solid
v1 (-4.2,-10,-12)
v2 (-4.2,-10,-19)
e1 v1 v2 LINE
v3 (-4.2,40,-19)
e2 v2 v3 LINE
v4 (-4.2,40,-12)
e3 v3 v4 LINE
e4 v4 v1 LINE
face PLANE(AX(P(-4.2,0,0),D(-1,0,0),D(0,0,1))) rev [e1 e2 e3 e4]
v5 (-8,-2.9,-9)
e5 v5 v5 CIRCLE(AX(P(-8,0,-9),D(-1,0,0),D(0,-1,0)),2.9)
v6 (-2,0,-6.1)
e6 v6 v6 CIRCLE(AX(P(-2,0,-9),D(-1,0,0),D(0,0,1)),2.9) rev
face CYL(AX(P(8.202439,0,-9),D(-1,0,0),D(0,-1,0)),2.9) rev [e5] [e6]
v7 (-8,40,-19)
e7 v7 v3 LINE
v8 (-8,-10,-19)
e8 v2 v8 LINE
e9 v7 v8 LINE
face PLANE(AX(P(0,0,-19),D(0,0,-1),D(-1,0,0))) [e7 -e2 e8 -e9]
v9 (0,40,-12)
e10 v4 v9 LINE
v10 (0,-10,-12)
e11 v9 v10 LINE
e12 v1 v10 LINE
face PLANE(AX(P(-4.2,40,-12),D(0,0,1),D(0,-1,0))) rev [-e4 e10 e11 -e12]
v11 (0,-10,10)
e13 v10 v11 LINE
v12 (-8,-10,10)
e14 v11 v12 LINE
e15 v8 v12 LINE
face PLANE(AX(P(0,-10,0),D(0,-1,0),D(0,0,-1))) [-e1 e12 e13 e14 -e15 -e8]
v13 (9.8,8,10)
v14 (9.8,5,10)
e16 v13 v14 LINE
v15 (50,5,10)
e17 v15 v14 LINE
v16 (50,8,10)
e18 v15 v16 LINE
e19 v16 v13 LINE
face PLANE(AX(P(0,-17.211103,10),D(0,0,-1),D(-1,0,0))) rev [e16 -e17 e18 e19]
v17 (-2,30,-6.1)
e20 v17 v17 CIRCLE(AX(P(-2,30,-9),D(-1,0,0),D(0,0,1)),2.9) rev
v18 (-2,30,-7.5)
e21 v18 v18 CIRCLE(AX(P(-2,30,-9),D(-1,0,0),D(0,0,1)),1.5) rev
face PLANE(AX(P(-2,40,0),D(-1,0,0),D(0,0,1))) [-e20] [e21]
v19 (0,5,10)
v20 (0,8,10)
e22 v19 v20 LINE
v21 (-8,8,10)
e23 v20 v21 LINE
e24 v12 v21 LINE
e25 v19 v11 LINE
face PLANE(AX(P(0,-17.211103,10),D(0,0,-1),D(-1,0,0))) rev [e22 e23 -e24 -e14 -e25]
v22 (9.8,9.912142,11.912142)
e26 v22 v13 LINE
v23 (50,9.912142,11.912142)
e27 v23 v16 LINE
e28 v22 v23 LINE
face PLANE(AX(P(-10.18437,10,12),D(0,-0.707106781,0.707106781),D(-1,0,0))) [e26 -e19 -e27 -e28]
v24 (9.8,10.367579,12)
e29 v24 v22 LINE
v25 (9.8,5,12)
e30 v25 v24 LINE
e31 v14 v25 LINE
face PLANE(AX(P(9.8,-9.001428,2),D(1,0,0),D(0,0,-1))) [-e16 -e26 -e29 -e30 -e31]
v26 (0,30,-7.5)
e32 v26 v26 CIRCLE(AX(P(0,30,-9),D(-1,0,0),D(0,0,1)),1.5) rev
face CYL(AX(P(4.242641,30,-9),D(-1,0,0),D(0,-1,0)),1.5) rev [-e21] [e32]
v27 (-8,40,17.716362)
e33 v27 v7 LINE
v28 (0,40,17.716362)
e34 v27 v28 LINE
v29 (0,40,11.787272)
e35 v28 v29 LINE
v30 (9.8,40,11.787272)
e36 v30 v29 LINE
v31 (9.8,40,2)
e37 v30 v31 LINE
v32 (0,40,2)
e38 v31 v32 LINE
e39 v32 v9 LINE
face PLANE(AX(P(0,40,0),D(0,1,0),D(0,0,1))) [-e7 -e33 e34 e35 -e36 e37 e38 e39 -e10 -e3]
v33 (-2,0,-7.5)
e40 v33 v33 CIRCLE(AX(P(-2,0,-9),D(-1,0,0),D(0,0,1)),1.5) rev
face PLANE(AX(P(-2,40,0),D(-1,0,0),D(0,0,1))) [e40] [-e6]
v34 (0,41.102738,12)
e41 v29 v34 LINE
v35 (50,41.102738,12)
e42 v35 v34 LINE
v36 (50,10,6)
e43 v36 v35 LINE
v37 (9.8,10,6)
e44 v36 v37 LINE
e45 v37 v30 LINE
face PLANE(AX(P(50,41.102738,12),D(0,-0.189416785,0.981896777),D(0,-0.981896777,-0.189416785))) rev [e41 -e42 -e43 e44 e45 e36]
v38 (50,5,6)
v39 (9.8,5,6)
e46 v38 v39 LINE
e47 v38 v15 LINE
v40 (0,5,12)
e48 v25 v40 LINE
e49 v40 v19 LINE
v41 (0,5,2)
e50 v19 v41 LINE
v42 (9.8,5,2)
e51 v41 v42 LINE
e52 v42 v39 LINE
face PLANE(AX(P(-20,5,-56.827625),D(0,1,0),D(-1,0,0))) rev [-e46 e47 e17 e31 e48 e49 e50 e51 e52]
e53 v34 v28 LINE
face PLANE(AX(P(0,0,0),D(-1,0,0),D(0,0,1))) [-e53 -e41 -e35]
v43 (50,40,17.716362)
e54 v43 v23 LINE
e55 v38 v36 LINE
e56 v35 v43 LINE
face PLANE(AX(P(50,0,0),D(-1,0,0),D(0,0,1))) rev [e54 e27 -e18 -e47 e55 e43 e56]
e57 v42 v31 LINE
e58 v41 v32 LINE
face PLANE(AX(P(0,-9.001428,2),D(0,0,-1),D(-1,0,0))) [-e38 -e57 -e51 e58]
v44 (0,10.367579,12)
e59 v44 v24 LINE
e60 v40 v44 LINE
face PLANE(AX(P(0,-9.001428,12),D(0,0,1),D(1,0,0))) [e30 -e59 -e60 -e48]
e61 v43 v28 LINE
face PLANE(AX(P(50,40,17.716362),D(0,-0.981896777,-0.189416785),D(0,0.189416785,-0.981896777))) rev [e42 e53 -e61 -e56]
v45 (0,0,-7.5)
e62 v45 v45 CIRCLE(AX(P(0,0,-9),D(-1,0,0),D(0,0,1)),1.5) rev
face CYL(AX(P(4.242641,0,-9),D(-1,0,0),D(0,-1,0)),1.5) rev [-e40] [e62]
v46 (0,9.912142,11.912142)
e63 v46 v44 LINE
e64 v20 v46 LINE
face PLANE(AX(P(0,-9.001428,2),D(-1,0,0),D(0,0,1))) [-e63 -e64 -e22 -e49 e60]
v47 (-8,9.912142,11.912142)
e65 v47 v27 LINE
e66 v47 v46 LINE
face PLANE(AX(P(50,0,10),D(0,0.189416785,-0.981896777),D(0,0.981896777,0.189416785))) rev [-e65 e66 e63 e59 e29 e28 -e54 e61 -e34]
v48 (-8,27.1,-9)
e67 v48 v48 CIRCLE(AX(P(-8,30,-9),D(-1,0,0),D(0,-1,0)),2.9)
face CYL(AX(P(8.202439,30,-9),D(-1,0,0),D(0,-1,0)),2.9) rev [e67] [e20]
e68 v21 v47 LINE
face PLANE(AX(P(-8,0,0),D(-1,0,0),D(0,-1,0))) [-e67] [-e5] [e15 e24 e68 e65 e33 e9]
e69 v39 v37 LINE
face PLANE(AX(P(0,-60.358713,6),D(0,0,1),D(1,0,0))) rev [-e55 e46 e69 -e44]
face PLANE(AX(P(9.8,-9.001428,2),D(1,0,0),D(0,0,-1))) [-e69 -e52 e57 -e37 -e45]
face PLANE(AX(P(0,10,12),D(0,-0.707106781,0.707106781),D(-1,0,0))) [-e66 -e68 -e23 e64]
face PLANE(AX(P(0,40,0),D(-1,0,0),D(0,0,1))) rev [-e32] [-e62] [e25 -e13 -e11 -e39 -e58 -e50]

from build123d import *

# Parameters (mm, degrees)
EXTRUDE_1_DEPTH      = 50
SKETCH_2_W           = 50
SKETCH_2_H           = 10
EXTRUDE_2_DEPTH      = 10
SKETCH_3_W           = 10
SKETCH_3_H           = 20
EXTRUDE_3_DEPTH      = 20
SKETCH_4_W           = 20
SKETCH_4_H           = 10
EXTRUDE_4_DEPTH      = 30
CUT_EXTRUDE_1_DEPTH  = 50
CHAMFER_1_SIZE       = 2
SKETCH_9_R           = 1.5
CUT_EXTRUDE_2_DEPTH  = 66.493778942
CUT_EXTRUDE_4_DEPTH  = 6
SKETCH_13_W          = 4
SKETCH_13_H          = 6
EXTRUDE_12_DEPTH     = 18
SKETCH_14_W          = 20
SKETCH_14_H          = 20
EXTRUDE_13_DEPTH     = 6
CUT_EXTRUDE_START    = -20
SKETCH_15_W          = 50
SKETCH_15_H          = 6
CUT_EXTRUDE_5_DEPTH  = 20
SKETCH_16_W          = 4
SKETCH_16_H          = 4
CUT_EXTRUDE_7_DEPTH  = 18
EXTRUDE_14_REACH     = 68.163
SKETCH_17_W          = 5
SKETCH_17_H          = 30
SKETCH_18_W          = 50
SKETCH_18_H          = 4
EXTRUDE_15_DEPTH     = 18
CUT_EXTRUDE_8_REACH  = 67.494
SKETCH_19_W          = 60
SKETCH_19_H          = 10
SKETCH_20_R          = 1.5
CUT_EXTRUDE_9_DEPTH  = 4
CHAMFER_2_SIZE       = 2
SKETCH_21_W          = 15
SKETCH_21_H          = 50
CUT_EXTRUDE_10_DEPTH = 10
SKETCH_22_W          = 5
SKETCH_22_H          = 50
EXTRUDE_16_DEPTH     = 19
SKETCH_23_W          = 7
SKETCH_23_H          = 50
CUT_EXTRUDE_11_DEPTH = 4.2
EXTRUDE_17_DEPTH     = 3
SKETCH_25_R          = 1.5
CUT_EXTRUDE_12_DEPTH = 8
SKETCH_26_R          = 2.9
CUT_EXTRUDE_13_DEPTH = 6
CUT_EXTRUDE_14_REACH = 67.988
SKETCH_27_W          = 4
SKETCH_27_H          = 10
SKETCH_29_W          = 8
SKETCH_29_H          = 10
EXTRUDE_18_DEPTH     = 6
SKETCH_30_W          = 50
SKETCH_30_H          = 5
CUT_EXTRUDE_15_DEPTH = 4
EXTRUDE_19_REACH     = 75.219
SKETCH_31_W          = 9.8
SKETCH_31_H          = 10


with BuildPart() as part:
    # 草图1 → 凸台-拉伸1 (new body)
    with BuildSketch(Plane(origin=(0, 0, 0), x_dir=(0, 0, -1), z_dir=(1, 0, 0))):
        Polygon((0, 0), (-10, 0), (-17.716362436, 40), (-12, 41.102738109), (-6, 10), (0, 10), align=None)
    extrude(amount=EXTRUDE_1_DEPTH)

    # 草图2 → 凸台-拉伸2 (add)
    with BuildSketch(Plane.XZ):
        with Locations((25, 5)):
            Rectangle(SKETCH_2_W, SKETCH_2_H)
    extrude(amount=EXTRUDE_2_DEPTH)

    # 草图3 → 凸台-拉伸3 (add)
    with BuildSketch(Plane.ZY):
        with Locations((5, 0)):
            Rectangle(SKETCH_3_W, SKETCH_3_H)
    extrude(amount=EXTRUDE_3_DEPTH)

    # 草图4 → 凸台-拉伸4 (add)
    with BuildSketch(Plane(origin=(0, 10, 0), x_dir=(1, 0, 0), z_dir=(0, 1, 0))):
        with Locations((-10, -5)):
            Rectangle(SKETCH_4_W, SKETCH_4_H)
    extrude(amount=EXTRUDE_4_DEPTH)

    # 草图5 → 切除-拉伸1 (cut)
    with BuildSketch(Plane(origin=(50, 0, 0), x_dir=(0, 0, -1), z_dir=(1, 0, 0))):
        Polygon((-10, 10), (-11.929090609, 10), (-10, 0), align=None)
    extrude(amount=-CUT_EXTRUDE_1_DEPTH, mode=Mode.SUBTRACT)

    # 倒角1
    # the kernel refuses this chamfer: 2 mm, written as the material it adds along each edge
    with BuildSketch(Plane(origin=(50, 10, 10), x_dir=(0, 0.027495876610586487, 0.9996219169112968), z_dir=(-1, 0, 0))) as chamfer_1_piece_1_section:
        Polygon((CHAMFER_1_SIZE * 0.999621916911, -CHAMFER_1_SIZE * 0.0274958766106), (-CHAMFER_1_SIZE * 0.0274958766106, -CHAMFER_1_SIZE * 0.999621916911), (0, 0), align=None)
    chamfer_1_piece_1 = extrude(amount=50, mode=Mode.PRIVATE)
    chamfer_1_piece_1 = split(chamfer_1_piece_1, bisect_by=Plane(origin=(25, 9.122791872, 11.759869213), z_dir=(0, 0.18941678522713282, -0.9818967774029093)), keep=Keep.TOP, mode=Mode.PRIVATE)
    add(chamfer_1_piece_1)

    # 草图9 → 切除-拉伸2 (cut, through all)
    with BuildSketch(Plane.XY.offset(10)):
        with Locations((-10, 30)):
            Circle(SKETCH_9_R)
        with Locations((30, 0)):
            Circle(SKETCH_9_R)
    extrude(amount=-CUT_EXTRUDE_2_DEPTH, mode=Mode.SUBTRACT)

    # 草图12 → 切除-拉伸4 (cut)
    with BuildSketch(Plane.XY.offset(10)):
        Polygon((0, 30.73515874), (0, 40), (-20, 40), (-20, -10), (50, -10), (50, 8), (0, 8), align=None)
    extrude(amount=-CUT_EXTRUDE_4_DEPTH, mode=Mode.SUBTRACT)

    # 草图13 → 凸台-拉伸12 (add)
    with BuildSketch(Plane.XZ.offset(-8)):
        with Locations((2, 7)):
            Rectangle(SKETCH_13_W, SKETCH_13_H)
        with Locations((48, 7)):
            Rectangle(SKETCH_13_W, SKETCH_13_H)
    extrude(amount=EXTRUDE_12_DEPTH)

    # 草图14 → 凸台-拉伸13 (add)
    with BuildSketch(Plane.XY.offset(4)):
        with Locations((-10, 0)):
            Rectangle(SKETCH_14_W, SKETCH_14_H)
    extrude(amount=EXTRUDE_13_DEPTH)

    # 草图15 → 切除-拉伸5 (cut)
    with BuildSketch(Plane(origin=(0, 10, 0), x_dir=(1, 0, 0), z_dir=(0, 1, 0)).offset(CUT_EXTRUDE_START)):
        with Locations((25, -3)):
            Rectangle(SKETCH_15_W, SKETCH_15_H)
    extrude(amount=CUT_EXTRUDE_5_DEPTH, mode=Mode.SUBTRACT)

    # 草图16 → 切除-拉伸7 (cut)
    with BuildSketch(Plane.XZ.offset(10)):
        with Locations((2, 8)):
            Rectangle(SKETCH_16_W, SKETCH_16_H)
        with Locations((48, 8)):
            Rectangle(SKETCH_16_W, SKETCH_16_H)
    extrude(amount=-CUT_EXTRUDE_7_DEPTH, mode=Mode.SUBTRACT)

    # 凸台-拉伸14: up to this plane
    extrude_14_end = Plane(origin=(50, 0, 10), z_dir=(0, 0.1894167852271328, -0.9818967774029093))
    # 草图17 → 凸台-拉伸14 (add, up to the surface)
    with BuildSketch(Plane.XY.offset(4), mode=Mode.PRIVATE) as extrude_14_sk1:
        with Locations((-2.5, 25)):
            Rectangle(SKETCH_17_W, SKETCH_17_H)
    extrude_14_tool1 = split(extrude(extrude_14_sk1.sketch, amount=EXTRUDE_14_REACH, mode=Mode.PRIVATE), bisect_by=extrude_14_end, keep=Keep.BOTH, mode=Mode.PRIVATE)
    add(extrude_14_tool1.solids().sort_by_distance((-2.5, 25, 4))[0])

    # 草图18 → 凸台-拉伸15 (add)
    with BuildSketch(Plane.XZ.offset(-8)):
        with Locations((25, 8)):
            Rectangle(SKETCH_18_W, SKETCH_18_H)
    extrude(amount=EXTRUDE_15_DEPTH)

    # 切除-拉伸8: up to this face of the body (flat: up to its plane)
    cut_extrude_8_end = Plane(part.part.faces().sort_by_distance((-12.539896603, 24.920206795, 4))[0])
    # 草图19 → 切除-拉伸8 (cut, up to the picked face)
    with BuildSketch(Plane.XY.offset(10), mode=Mode.PRIVATE) as cut_extrude_8_sk1:
        with Locations((10, 0)):
            Rectangle(SKETCH_19_W, SKETCH_19_H)
    cut_extrude_8_tool1 = split(extrude(cut_extrude_8_sk1.sketch, amount=-CUT_EXTRUDE_8_REACH, mode=Mode.PRIVATE), bisect_by=cut_extrude_8_end, keep=Keep.BOTH, mode=Mode.PRIVATE)
    add(cut_extrude_8_tool1.solids().sort_by(Axis((10, 0, 10), (0, 0, -1)))[0], mode=Mode.SUBTRACT)

    # 草图20 → 切除-拉伸9 (cut)
    with BuildSketch(Plane.XY.offset(4)):
        with Locations((-10, 0)):
            Circle(SKETCH_20_R)
    extrude(amount=-CUT_EXTRUDE_9_DEPTH, mode=Mode.SUBTRACT)

    # 倒角2
    # the kernel refuses this chamfer: 2 mm, written as the material it adds along each edge
    with BuildSketch(Plane(origin=(5.143365976, 10, 10), x_dir=(0, -0.9996219169112968, -0.027495876610586487), z_dir=(-1, 0, 0))) as chamfer_2_piece_1_section:
        Polygon((CHAMFER_2_SIZE * 0.999621916911, CHAMFER_2_SIZE * 0.0274958766106), (-CHAMFER_2_SIZE * 0.0274958766106, CHAMFER_2_SIZE * 0.999621916911), (0, 0), align=None)
    chamfer_2_piece_1 = extrude(amount=10.143365976, mode=Mode.PRIVATE)
    chamfer_2_piece_1 = split(chamfer_2_piece_1, bisect_by=Plane(origin=(-2.5, 9.121127045, 11.759548053), z_dir=(0, 0.18941678522698793, -0.9818967774029372)), keep=Keep.TOP, mode=Mode.PRIVATE)
    add(chamfer_2_piece_1)

    # 草图21 → 切除-拉伸10 (cut)
    with BuildSketch(Plane.XY.offset(10)):
        with Locations((-12.5, 15)):
            Rectangle(SKETCH_21_W, SKETCH_21_H)
    extrude(amount=-CUT_EXTRUDE_10_DEPTH, mode=Mode.SUBTRACT)

    # 草图22 → 凸台-拉伸16 (add)
    with BuildSketch(Plane(origin=(0, 0, 0), x_dir=(-1, 0, 0), z_dir=(0, 0, -1))):
        with Locations((2.5, 15)):
            Rectangle(SKETCH_22_W, SKETCH_22_H)
    extrude(amount=EXTRUDE_16_DEPTH)

    # 草图23 → 切除-拉伸11 (cut)
    with BuildSketch(Plane(origin=(0, 0, 0), x_dir=(0, 0, -1), z_dir=(1, 0, 0))):
        with Locations((15.5, 15)):
            Rectangle(SKETCH_23_W, SKETCH_23_H)
    extrude(amount=-CUT_EXTRUDE_11_DEPTH, mode=Mode.SUBTRACT)

    # 草图24 → 凸台-拉伸17 (add)
    with BuildSketch(Plane.ZY.offset(5)):
        Polygon((17.716362436, 40), (-19, 40), (-19, -10), (10, -10), (10, -5), (4, -5), (4, 5), (10, 5), (10, 8), (11.912142006, 9.912142006), align=None)
    extrude(amount=EXTRUDE_17_DEPTH)

    # 草图25 → 切除-拉伸12 (cut)
    with BuildSketch(Plane.ZY.offset(8)):
        with Locations(Location((-9, 30, 0), (0, 0, 270))):
            Circle(SKETCH_25_R)
        with Locations(Location((-9, 0, 0), (0, 0, 270))):
            Circle(SKETCH_25_R)
    extrude(amount=-CUT_EXTRUDE_12_DEPTH, mode=Mode.SUBTRACT)

    # 草图26 → 切除-拉伸13 (cut)
    with BuildSketch(Plane.ZY.offset(8)):
        with Locations(Location((-9, 30, 0), (0, 0, 270))):
            Circle(SKETCH_26_R)
        with Locations(Location((-9, 0, 0), (0, 0, 270))):
            Circle(SKETCH_26_R)
    extrude(amount=-CUT_EXTRUDE_13_DEPTH, mode=Mode.SUBTRACT)

    # 草图27 → 切除-拉伸14 (cut, up to next)
    with BuildSketch(Plane.ZY.offset(-40), mode=Mode.PRIVATE) as cut_extrude_14_sk1:
        with Locations((8, 0)):
            Rectangle(SKETCH_27_W, SKETCH_27_H)
    cut_extrude_14_tool1 = extrude(cut_extrude_14_sk1.sketch, amount=-CUT_EXTRUDE_14_REACH, mode=Mode.PRIVATE) & part.part
    add(cut_extrude_14_tool1.solids().sort_by_distance((40, 0, 8))[0], mode=Mode.SUBTRACT)

    # 草图29 → 凸台-拉伸18 (add)
    with BuildSketch(Plane.XY.offset(4)):
        with Locations((-4, 0)):
            Rectangle(SKETCH_29_W, SKETCH_29_H)
    extrude(amount=EXTRUDE_18_DEPTH)

    # 草图30 → 切除-拉伸15 (cut)
    with BuildSketch(Plane.XY.offset(10)):
        with Locations((25, -7.5)):
            Rectangle(SKETCH_30_W, SKETCH_30_H)
    extrude(amount=-CUT_EXTRUDE_15_DEPTH, mode=Mode.SUBTRACT)

    # 凸台-拉伸19: up to this face of the body (flat: up to its plane)
    extrude_19_end = Plane(part.part.faces().sort_by_distance((25, 5, 8))[0])
    # 草图31 → 凸台-拉伸19 (add, up to the picked face)
    with BuildSketch(Plane(origin=(0, 40, 0), x_dir=(1, 0, 0), z_dir=(0, 1, 0)), mode=Mode.PRIVATE) as extrude_19_sk1:
        with Locations((4.9, -7)):
            Rectangle(SKETCH_31_W, SKETCH_31_H)
    extrude_19_tool1 = split(extrude(extrude_19_sk1.sketch, amount=-EXTRUDE_19_REACH, mode=Mode.PRIVATE), bisect_by=extrude_19_end, keep=Keep.BOTH, mode=Mode.PRIVATE)
    add(extrude_19_tool1.solids().sort_by(Axis((4.9, 40, 7), (0, -1, 0)))[0])


solid = part.part
